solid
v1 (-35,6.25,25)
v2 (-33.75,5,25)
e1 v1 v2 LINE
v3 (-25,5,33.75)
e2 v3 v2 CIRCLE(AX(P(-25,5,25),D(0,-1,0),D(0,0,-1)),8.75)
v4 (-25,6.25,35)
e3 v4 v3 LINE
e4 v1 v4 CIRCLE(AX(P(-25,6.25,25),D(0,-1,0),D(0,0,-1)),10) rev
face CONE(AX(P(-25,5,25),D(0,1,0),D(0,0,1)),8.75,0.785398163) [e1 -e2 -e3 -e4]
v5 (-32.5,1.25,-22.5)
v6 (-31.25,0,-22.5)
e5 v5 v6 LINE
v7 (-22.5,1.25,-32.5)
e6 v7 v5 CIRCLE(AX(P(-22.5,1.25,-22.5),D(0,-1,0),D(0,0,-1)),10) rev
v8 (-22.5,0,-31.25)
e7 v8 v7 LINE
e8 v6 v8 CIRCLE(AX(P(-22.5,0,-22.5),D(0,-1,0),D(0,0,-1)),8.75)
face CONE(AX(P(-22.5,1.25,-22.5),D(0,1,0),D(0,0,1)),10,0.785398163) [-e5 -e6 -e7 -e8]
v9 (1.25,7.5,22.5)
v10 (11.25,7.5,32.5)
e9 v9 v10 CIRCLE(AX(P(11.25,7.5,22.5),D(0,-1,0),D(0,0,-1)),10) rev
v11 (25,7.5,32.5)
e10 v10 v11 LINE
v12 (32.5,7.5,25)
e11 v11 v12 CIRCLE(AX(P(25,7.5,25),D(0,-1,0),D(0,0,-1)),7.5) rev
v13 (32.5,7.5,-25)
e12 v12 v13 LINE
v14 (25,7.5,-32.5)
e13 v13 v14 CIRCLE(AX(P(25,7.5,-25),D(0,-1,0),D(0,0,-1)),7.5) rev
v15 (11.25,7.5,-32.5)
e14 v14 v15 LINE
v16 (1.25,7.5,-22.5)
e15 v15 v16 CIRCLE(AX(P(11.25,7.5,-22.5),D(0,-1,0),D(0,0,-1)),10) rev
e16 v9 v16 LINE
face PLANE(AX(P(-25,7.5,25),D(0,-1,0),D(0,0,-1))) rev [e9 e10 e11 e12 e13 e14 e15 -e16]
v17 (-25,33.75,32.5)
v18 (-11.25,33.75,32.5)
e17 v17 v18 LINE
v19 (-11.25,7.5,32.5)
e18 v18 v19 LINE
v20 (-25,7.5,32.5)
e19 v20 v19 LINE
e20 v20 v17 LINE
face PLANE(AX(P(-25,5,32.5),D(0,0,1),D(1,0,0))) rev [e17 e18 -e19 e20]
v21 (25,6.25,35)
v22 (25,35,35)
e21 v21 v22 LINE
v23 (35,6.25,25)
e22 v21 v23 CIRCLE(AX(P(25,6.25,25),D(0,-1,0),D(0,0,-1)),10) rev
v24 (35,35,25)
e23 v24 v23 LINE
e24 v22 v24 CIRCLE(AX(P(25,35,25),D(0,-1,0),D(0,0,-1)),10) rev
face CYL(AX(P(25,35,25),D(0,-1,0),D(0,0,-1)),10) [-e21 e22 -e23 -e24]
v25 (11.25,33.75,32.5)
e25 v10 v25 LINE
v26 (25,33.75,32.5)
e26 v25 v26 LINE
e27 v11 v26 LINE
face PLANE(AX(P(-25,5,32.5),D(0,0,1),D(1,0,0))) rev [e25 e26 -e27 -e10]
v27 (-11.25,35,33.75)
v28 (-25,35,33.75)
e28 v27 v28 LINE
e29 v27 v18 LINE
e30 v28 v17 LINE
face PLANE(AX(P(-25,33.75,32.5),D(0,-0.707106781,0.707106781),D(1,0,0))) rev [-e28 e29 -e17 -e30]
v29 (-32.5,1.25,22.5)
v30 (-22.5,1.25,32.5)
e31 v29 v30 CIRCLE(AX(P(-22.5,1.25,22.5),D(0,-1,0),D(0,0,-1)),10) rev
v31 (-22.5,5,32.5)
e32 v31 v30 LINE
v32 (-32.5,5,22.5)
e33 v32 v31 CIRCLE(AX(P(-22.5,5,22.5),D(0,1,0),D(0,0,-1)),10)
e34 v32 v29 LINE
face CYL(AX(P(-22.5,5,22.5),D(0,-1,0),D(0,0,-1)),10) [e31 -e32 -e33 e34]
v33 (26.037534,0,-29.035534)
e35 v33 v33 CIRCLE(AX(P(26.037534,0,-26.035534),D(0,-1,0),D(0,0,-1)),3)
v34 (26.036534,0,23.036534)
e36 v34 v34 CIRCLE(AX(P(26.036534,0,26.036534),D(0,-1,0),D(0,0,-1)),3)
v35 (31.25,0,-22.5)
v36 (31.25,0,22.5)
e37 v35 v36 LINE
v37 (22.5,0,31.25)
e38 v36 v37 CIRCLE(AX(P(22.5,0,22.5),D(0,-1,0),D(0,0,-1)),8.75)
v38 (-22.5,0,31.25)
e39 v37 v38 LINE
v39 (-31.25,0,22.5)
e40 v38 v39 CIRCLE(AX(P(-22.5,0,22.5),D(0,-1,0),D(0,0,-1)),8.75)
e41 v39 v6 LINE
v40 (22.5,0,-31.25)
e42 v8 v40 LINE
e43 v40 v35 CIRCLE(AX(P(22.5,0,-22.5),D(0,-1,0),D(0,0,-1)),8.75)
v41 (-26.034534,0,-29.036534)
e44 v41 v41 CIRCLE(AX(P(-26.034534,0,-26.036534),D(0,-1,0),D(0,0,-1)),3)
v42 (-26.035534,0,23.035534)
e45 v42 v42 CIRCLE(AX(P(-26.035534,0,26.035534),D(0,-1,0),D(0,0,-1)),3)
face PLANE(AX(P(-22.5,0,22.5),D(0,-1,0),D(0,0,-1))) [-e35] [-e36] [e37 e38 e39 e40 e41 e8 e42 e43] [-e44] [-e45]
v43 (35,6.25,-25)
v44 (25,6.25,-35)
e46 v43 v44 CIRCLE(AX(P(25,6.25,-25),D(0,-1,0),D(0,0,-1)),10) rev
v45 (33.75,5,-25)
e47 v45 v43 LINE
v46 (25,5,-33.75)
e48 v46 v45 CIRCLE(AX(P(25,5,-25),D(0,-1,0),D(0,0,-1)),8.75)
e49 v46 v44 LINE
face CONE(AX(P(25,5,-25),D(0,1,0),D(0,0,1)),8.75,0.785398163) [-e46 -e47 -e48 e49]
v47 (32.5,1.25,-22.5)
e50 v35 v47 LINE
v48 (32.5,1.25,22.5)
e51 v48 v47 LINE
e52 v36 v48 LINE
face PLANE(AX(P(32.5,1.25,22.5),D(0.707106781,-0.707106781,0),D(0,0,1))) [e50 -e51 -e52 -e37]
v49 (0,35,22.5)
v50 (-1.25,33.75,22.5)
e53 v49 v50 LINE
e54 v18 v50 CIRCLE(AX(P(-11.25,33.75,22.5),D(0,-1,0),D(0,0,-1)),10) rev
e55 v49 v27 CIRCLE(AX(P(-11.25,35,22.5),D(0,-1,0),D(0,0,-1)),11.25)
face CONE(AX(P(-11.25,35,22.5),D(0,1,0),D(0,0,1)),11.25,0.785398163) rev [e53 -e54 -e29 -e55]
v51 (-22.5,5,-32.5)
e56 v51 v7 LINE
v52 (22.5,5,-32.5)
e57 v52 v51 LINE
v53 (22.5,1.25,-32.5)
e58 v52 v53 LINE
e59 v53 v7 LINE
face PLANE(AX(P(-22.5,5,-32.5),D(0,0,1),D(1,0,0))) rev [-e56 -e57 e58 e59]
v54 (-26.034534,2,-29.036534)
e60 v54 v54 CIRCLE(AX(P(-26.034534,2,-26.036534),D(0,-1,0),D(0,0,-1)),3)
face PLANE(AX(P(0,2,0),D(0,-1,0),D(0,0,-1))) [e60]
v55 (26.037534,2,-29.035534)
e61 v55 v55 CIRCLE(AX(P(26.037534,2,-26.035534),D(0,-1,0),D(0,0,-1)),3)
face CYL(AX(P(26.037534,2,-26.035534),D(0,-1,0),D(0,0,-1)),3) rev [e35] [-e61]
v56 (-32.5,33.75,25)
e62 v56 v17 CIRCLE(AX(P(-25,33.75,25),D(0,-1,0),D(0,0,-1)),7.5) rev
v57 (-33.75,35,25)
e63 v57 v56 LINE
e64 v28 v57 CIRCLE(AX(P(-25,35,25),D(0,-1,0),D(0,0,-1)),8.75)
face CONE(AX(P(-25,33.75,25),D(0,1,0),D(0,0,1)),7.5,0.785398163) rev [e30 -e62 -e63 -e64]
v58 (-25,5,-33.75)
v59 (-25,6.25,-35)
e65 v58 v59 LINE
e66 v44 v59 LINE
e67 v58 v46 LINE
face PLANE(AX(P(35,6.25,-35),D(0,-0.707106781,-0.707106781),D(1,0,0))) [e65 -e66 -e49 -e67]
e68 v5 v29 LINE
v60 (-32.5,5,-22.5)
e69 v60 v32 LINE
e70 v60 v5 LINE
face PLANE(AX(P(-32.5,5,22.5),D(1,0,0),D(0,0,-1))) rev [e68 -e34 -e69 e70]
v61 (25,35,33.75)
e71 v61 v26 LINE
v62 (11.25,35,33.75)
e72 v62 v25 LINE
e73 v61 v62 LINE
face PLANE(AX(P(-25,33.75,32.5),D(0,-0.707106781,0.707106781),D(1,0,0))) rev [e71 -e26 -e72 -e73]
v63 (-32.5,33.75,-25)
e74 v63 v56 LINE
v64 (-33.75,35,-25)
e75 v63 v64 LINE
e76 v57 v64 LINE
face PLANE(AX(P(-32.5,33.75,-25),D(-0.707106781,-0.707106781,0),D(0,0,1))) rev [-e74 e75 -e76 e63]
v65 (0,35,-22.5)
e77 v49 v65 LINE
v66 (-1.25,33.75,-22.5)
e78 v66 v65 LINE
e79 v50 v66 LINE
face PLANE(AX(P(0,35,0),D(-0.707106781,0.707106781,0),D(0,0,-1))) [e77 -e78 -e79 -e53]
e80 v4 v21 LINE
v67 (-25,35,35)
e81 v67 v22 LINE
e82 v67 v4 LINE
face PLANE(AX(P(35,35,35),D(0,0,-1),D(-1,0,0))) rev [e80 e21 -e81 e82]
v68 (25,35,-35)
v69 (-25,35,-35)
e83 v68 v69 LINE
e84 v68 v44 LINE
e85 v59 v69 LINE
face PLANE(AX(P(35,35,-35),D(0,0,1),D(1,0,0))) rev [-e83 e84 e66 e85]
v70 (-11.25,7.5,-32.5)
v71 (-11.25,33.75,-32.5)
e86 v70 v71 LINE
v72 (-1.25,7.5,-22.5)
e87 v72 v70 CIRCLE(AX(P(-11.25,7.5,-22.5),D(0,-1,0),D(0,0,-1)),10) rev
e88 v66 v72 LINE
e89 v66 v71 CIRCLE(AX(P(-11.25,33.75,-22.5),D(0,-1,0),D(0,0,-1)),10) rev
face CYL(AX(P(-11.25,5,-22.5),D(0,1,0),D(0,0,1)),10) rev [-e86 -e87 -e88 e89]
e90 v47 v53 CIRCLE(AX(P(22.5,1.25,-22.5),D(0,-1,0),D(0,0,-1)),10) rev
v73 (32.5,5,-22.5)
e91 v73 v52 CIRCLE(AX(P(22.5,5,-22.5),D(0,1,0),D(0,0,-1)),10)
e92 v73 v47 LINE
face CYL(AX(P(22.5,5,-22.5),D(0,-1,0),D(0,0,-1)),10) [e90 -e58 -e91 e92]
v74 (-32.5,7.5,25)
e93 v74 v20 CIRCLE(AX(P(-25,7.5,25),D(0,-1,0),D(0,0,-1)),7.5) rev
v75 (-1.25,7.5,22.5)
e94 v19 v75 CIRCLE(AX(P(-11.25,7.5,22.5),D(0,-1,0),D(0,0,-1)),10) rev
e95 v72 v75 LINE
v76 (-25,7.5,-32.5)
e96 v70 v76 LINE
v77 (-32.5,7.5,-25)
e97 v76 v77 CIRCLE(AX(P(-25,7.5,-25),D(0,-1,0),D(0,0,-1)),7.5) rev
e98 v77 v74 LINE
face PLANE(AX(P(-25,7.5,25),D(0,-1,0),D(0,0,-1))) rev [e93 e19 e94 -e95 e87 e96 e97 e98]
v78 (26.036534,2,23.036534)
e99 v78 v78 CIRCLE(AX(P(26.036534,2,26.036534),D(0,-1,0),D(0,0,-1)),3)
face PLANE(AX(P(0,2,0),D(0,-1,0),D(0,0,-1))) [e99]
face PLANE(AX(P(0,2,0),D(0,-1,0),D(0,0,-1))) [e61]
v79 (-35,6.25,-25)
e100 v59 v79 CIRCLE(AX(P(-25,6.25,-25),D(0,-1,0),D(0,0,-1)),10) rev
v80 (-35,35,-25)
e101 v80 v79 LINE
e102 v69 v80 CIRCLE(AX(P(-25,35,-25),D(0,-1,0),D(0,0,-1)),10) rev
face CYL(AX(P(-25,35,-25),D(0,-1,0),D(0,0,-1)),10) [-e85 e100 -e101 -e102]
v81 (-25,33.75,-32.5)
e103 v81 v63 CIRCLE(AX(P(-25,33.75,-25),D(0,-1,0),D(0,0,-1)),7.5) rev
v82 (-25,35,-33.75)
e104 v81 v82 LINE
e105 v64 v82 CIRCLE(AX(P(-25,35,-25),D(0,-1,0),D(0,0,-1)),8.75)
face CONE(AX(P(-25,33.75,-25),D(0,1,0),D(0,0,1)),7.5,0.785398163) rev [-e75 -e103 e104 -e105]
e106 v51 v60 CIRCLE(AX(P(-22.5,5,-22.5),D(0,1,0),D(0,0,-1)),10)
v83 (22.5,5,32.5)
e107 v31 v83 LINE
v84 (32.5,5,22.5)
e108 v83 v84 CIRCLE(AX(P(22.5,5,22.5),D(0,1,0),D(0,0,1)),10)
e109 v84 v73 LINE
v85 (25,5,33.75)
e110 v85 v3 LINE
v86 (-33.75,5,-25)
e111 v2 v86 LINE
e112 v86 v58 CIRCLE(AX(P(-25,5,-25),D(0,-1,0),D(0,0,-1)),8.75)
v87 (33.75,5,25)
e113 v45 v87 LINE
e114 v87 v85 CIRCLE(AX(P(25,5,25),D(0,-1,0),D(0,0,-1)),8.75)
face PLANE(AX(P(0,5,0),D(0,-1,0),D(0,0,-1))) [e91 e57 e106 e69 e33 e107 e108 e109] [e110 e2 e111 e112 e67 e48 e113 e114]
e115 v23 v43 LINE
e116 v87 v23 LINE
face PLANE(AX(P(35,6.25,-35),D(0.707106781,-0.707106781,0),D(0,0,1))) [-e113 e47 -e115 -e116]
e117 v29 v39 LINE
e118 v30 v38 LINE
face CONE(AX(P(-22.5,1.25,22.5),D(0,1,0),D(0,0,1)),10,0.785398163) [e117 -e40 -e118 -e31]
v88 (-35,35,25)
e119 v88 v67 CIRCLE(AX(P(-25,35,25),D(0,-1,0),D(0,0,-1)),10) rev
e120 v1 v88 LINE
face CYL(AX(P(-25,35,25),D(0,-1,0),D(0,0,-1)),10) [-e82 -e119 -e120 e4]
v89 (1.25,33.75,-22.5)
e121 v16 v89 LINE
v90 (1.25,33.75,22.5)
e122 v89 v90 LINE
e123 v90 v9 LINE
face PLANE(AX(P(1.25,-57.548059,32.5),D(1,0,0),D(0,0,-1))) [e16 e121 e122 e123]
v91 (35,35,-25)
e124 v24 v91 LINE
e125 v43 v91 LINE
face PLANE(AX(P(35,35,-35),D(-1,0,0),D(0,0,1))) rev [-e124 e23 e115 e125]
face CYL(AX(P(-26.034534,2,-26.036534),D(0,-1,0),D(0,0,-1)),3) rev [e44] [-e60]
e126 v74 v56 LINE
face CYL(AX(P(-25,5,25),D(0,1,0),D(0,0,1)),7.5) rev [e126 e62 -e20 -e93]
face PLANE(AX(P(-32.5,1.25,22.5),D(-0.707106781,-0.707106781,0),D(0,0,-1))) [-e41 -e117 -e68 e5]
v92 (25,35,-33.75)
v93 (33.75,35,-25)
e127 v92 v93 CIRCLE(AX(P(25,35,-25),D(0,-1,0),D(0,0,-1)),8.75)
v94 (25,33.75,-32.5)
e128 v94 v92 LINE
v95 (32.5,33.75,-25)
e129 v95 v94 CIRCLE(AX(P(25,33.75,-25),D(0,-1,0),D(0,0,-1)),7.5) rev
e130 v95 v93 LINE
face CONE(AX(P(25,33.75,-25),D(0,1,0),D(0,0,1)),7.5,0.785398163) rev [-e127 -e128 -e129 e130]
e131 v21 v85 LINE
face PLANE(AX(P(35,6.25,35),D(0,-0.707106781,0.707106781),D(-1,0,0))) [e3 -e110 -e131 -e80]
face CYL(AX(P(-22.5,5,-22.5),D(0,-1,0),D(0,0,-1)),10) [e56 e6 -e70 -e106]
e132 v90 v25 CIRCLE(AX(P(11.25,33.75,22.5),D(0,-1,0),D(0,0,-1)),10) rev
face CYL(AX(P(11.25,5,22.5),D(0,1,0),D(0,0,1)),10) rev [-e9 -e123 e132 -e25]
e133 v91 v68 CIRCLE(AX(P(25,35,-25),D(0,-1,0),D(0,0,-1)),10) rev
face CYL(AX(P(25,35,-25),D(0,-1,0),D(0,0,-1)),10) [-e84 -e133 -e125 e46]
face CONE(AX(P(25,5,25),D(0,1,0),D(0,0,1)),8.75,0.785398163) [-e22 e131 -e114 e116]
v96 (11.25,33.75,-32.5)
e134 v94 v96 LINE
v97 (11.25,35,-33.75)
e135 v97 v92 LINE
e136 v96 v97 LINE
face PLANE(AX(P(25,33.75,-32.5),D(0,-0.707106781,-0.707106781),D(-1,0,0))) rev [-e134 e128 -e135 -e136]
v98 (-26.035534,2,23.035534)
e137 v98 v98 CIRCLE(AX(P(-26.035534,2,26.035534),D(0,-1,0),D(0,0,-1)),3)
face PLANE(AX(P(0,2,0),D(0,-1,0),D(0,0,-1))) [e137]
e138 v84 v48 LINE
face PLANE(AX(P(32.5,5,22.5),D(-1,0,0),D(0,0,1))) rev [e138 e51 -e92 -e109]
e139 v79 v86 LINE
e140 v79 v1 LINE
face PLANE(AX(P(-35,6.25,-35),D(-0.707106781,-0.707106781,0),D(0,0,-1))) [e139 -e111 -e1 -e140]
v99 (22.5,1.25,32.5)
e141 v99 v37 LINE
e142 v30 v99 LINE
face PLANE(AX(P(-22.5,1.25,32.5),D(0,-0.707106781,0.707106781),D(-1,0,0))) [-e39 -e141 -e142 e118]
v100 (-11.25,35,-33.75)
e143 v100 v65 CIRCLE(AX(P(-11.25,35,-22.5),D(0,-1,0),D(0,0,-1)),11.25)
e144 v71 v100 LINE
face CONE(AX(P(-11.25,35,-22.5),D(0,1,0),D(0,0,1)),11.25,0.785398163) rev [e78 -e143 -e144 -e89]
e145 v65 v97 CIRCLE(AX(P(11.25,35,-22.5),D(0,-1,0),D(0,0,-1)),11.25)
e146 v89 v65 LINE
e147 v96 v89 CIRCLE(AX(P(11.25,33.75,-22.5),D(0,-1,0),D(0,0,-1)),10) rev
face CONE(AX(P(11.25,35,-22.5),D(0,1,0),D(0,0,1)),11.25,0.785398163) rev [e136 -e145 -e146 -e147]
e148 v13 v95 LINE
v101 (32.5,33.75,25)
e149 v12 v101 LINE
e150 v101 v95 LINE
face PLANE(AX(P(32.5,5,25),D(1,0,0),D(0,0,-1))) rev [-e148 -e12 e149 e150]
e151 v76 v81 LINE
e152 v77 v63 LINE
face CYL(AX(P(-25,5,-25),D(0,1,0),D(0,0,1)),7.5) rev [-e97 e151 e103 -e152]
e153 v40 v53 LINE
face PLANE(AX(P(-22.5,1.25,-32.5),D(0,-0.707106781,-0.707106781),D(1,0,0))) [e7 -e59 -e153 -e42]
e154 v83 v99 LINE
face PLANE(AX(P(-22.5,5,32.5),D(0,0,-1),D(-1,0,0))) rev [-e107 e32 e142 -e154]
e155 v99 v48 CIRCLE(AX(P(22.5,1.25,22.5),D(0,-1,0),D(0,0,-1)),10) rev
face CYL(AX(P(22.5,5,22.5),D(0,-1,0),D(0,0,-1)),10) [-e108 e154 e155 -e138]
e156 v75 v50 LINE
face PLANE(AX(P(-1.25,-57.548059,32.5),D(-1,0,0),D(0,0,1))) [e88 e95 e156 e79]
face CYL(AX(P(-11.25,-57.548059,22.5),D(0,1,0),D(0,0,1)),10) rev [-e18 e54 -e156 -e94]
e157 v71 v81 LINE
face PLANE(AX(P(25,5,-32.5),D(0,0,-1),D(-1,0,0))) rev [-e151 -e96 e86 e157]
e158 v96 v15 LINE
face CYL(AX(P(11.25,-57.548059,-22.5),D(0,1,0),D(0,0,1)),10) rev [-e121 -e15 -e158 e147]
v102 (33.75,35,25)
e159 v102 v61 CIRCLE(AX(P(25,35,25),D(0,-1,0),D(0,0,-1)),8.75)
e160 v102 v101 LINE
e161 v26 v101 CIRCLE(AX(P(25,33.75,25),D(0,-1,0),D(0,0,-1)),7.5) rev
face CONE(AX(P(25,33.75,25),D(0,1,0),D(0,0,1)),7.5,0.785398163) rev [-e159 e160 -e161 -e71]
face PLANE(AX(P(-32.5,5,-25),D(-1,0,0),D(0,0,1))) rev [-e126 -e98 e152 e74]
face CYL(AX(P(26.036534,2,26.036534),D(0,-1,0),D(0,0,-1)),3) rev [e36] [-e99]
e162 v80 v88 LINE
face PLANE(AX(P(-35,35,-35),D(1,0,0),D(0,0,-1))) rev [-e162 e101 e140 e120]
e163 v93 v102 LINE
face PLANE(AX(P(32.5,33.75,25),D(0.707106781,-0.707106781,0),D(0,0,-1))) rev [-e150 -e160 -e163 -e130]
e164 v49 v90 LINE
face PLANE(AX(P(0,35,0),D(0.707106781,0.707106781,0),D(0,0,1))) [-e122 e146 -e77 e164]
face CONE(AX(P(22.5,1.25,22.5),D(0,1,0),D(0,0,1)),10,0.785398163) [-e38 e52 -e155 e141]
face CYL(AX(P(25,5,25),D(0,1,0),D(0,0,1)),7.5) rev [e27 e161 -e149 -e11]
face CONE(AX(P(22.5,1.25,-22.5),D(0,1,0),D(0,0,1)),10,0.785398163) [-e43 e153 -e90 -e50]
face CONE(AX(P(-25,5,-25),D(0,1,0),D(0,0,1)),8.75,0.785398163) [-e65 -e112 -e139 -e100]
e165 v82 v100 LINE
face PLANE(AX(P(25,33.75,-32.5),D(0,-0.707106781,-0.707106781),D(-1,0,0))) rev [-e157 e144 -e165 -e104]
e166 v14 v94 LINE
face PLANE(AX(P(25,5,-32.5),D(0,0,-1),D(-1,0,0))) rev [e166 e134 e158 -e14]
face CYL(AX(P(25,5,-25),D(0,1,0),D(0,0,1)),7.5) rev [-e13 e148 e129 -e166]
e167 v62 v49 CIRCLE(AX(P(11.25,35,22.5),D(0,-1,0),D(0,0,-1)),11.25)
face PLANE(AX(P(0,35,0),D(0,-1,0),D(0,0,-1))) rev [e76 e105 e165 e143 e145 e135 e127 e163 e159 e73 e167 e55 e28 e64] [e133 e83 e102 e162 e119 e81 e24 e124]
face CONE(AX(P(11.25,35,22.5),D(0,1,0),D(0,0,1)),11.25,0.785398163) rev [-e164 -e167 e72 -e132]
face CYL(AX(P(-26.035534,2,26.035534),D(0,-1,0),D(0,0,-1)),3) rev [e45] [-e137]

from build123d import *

# Parameters (mm, degrees)
BOSS_EXTRUDE4_DEPTH = 5
SKETCH6_W           = 70
SKETCH6_H           = 70
BOSS_EXTRUDE5_DEPTH = 30
SKETCH8_R           = 3
CUT_EXTRUDE1_DEPTH  = 2
FILLET1_R           = 10
CUT_EXTRUDE2_DEPTH  = 30
BOSS_EXTRUDE6_DEPTH = 2.5
SKETCH11_W          = 2.5
SKETCH11_H          = 65
BOSS_EXTRUDE7_DEPTH = 27.5
FILLET2_R           = 10
CHAMFER1_SIZE       = 1.25
CHAMFER2_SIZE       = 1.25


with BuildPart() as part:
    # Sketch5 → Boss-Extrude4 (new body)
    with BuildSketch(Plane(origin=(0, 0, 0), x_dir=(1, 0, 0), z_dir=(0, 1, 0))):
        with BuildLine():
            Line((-22.5, -32.5), (22.5, -32.5))
            ThreePointArc((22.5, -32.5), (29.571067812, -29.571067812), (32.5, -22.5))
            Line((32.5, -22.5), (32.5, 22.5))
            ThreePointArc((32.5, 22.5), (29.571067812, 29.571067812), (22.5, 32.5))
            Line((22.5, 32.5), (-22.5, 32.5))
            ThreePointArc((-22.5, 32.5), (-29.571067812, 29.571067812), (-32.5, 22.5))
            Line((-32.5, 22.5), (-32.5, -22.5))
            ThreePointArc((-32.5, -22.5), (-29.571067812, -29.571067812), (-22.5, -32.5))
        make_face()
    extrude(amount=BOSS_EXTRUDE4_DEPTH)

    # Sketch6 → Boss-Extrude5 (add)
    with BuildSketch(Plane(origin=(0, 5, 0), x_dir=(1, 0, 0), z_dir=(0, 1, 0))):
        Rectangle(SKETCH6_W, SKETCH6_H)
    extrude(amount=BOSS_EXTRUDE5_DEPTH)

    # Sketch8 → Cut-Extrude1 (cut)
    with BuildSketch(Plane.XZ):
        with Locations(Location((26.037533906, -26.035533906, 0), (0, 0, 270))):
            Circle(SKETCH8_R)
        with Locations(Location((26.036533906, 26.036533906, 0), (0, 0, 270))):
            Circle(SKETCH8_R)
        with BuildLine():
            ThreePointArc((-23.035533906, 26.035533906), (-24.887483609, 28.807172503), (-28.156854249, 28.156854249))
            Line((-28.156854249, 28.156854249), (-23.914213562, 23.914213562))
            ThreePointArc((-23.914213562, 23.914213562), (-23.263895308, 24.887483609), (-23.035533906, 26.035533906))
        make_face()
        with BuildLine():
            Line((-23.914213562, 23.914213562), (-28.156854249, 28.156854249))
            ThreePointArc((-28.156854249, 28.156854249), (-28.156854249, 23.914213562), (-23.914213562, 23.914213562))
        make_face()
        with Locations(Location((-26.034533906, -26.036533906, 0), (0, 0, 270))):
            Circle(SKETCH8_R)
    extrude(amount=-CUT_EXTRUDE1_DEPTH, mode=Mode.SUBTRACT)

    # Fillet1
    fillet1_edges = [part.edges().sort_by_distance(p)[0] for p in [
        (-35, 20, -35),
        (-35, 20, 35),
        (35, 20, 35),
        (35, 20, -35),
    ]]
    fillet(fillet1_edges, radius=FILLET1_R)

    # Sketch9 → Cut-Extrude2 (cut)
    with BuildSketch(Plane(origin=(0, 35, 0), x_dir=(1, 0, 0), z_dir=(0, 1, 0))):
        with BuildLine():
            Line((25, 32.5), (-25, 32.5))
            ThreePointArc((-25, 32.5), (-30.303300859, 30.303300859), (-32.5, 25))
            Line((-32.5, 25), (-32.5, -25))
            ThreePointArc((-32.5, -25), (-30.303300859, -30.303300859), (-25, -32.5))
            Line((-25, -32.5), (25, -32.5))
            ThreePointArc((25, -32.5), (30.303300859, -30.303300859), (32.5, -25))
            Line((32.5, -25), (32.5, 25))
            ThreePointArc((32.5, 25), (30.303300859, 30.303300859), (25, 32.5))
        make_face()
    extrude(amount=-CUT_EXTRUDE2_DEPTH, mode=Mode.SUBTRACT)


with BuildPart() as cut_extrude2_piece_1:
    # of the separate pieces the step leaves, piece 1, a body of its own (cut_extrude2_pieces)
    add(part.part.solids().sort_by_distance((-22.5, 0, 32.5))[0])



with BuildPart() as cut_extrude2_piece_2:
    # of the separate pieces the step leaves, piece 2, a body of its own (cut_extrude2_pieces)
    add(part.part.solids().sort_by_distance((25, 5, -35))[0])


with BuildPart() as cut_extrude2_piece_1_1:
    add(cut_extrude2_piece_1.part)

    add(cut_extrude2_piece_2.part)  # Boss-Extrude6 merges Cut-Extrude2 piece 2
    # Sketch10 → Boss-Extrude6 (add)
    with BuildSketch(Plane.XZ.offset(-5)):
        with BuildLine():
            Line((-35, 25), (-35, -25))
            ThreePointArc((-35, -25), (-32.071067812, -32.071067812), (-25, -35))
            Line((-25, -35), (25, -35))
            ThreePointArc((25, -35), (32.071067812, -32.071067812), (35, -25))
            Line((35, -25), (35, 25))
            ThreePointArc((35, 25), (32.071067812, 32.071067812), (25, 35))
            Line((25, 35), (-25, 35))
            ThreePointArc((-25, 35), (-32.071067812, 32.071067812), (-35, 25))
        make_face()
    extrude(amount=-BOSS_EXTRUDE6_DEPTH)

    # Sketch11 → Boss-Extrude7 (add)
    with BuildSketch(Plane(origin=(0, 35, 0), x_dir=(1, 0, 0), z_dir=(0, 1, 0))):
        Rectangle(SKETCH11_W, SKETCH11_H)
    extrude(amount=-BOSS_EXTRUDE7_DEPTH)

    # Fillet2
    fillet2_edges = [cut_extrude2_piece_1_1.edges().sort_by_distance(p)[0] for p in [
        (-1.25, 21.25, -32.5),
        (-1.25, 21.25, 32.5),
        (1.25, 21.25, 32.5),
        (1.25, 21.25, -32.5),
    ]]
    fillet(fillet2_edges, radius=FILLET2_R)

    # Chamfer1
    chamfer1_edges = [cut_extrude2_piece_1_1.edges().sort_by_distance(p)[0] for p in [
        (18.125, 35, -32.5),
        (-30.303300859, 35, -30.303300859),
        (-32.5, 35, 0),
        (-30.303300859, 35, 30.303300859),
        (-18.125, 35, 32.5),
        (30.303300859, 35, 30.303300859),
        (32.5, 35, 0),
        (1.25, 35, 0),
        (18.125, 35, 32.5),
        (-1.25, 35, 0),
        (-18.125, 35, -32.5),
        (4.178932188, 35, -29.571067812),
        (4.178932188, 35, 29.571067812),
        (-4.178932188, 35, 29.571067812),
        (-4.178932188, 35, -29.571067812),
        (30.303300859, 35, -30.303300859),
    ]]
    chamfer(chamfer1_edges, length=CHAMFER1_SIZE - 0.0001)  # a hair under: the kernel refuses the full size

    # Chamfer2
    chamfer2_edges = [cut_extrude2_piece_1_1.edges().sort_by_distance(p)[0] for p in [
        (-29.571067812, 0, 29.571067812),
        (0, 0, 32.5),
        (29.571067812, 0, 29.571067812),
        (32.5, 0, 0),
        (29.571067812, 0, -29.571067812),
        (0, 0, -32.5),
        (-29.571067812, 0, -29.571067812),
        (-32.5, 0, 0),
        (-35, 5, 0),
        (0, 5, -35),
        (35, 5, 0),
        (0, 5, 35),
        (32.071067812, 5, -32.071067812),
        (32.071067812, 5, 32.071067812),
        (-32.071067812, 5, 32.071067812),
        (-32.071067812, 5, -32.071067812),
    ]]
    chamfer(chamfer2_edges, length=CHAMFER2_SIZE)


solid = cut_extrude2_piece_1_1.part
